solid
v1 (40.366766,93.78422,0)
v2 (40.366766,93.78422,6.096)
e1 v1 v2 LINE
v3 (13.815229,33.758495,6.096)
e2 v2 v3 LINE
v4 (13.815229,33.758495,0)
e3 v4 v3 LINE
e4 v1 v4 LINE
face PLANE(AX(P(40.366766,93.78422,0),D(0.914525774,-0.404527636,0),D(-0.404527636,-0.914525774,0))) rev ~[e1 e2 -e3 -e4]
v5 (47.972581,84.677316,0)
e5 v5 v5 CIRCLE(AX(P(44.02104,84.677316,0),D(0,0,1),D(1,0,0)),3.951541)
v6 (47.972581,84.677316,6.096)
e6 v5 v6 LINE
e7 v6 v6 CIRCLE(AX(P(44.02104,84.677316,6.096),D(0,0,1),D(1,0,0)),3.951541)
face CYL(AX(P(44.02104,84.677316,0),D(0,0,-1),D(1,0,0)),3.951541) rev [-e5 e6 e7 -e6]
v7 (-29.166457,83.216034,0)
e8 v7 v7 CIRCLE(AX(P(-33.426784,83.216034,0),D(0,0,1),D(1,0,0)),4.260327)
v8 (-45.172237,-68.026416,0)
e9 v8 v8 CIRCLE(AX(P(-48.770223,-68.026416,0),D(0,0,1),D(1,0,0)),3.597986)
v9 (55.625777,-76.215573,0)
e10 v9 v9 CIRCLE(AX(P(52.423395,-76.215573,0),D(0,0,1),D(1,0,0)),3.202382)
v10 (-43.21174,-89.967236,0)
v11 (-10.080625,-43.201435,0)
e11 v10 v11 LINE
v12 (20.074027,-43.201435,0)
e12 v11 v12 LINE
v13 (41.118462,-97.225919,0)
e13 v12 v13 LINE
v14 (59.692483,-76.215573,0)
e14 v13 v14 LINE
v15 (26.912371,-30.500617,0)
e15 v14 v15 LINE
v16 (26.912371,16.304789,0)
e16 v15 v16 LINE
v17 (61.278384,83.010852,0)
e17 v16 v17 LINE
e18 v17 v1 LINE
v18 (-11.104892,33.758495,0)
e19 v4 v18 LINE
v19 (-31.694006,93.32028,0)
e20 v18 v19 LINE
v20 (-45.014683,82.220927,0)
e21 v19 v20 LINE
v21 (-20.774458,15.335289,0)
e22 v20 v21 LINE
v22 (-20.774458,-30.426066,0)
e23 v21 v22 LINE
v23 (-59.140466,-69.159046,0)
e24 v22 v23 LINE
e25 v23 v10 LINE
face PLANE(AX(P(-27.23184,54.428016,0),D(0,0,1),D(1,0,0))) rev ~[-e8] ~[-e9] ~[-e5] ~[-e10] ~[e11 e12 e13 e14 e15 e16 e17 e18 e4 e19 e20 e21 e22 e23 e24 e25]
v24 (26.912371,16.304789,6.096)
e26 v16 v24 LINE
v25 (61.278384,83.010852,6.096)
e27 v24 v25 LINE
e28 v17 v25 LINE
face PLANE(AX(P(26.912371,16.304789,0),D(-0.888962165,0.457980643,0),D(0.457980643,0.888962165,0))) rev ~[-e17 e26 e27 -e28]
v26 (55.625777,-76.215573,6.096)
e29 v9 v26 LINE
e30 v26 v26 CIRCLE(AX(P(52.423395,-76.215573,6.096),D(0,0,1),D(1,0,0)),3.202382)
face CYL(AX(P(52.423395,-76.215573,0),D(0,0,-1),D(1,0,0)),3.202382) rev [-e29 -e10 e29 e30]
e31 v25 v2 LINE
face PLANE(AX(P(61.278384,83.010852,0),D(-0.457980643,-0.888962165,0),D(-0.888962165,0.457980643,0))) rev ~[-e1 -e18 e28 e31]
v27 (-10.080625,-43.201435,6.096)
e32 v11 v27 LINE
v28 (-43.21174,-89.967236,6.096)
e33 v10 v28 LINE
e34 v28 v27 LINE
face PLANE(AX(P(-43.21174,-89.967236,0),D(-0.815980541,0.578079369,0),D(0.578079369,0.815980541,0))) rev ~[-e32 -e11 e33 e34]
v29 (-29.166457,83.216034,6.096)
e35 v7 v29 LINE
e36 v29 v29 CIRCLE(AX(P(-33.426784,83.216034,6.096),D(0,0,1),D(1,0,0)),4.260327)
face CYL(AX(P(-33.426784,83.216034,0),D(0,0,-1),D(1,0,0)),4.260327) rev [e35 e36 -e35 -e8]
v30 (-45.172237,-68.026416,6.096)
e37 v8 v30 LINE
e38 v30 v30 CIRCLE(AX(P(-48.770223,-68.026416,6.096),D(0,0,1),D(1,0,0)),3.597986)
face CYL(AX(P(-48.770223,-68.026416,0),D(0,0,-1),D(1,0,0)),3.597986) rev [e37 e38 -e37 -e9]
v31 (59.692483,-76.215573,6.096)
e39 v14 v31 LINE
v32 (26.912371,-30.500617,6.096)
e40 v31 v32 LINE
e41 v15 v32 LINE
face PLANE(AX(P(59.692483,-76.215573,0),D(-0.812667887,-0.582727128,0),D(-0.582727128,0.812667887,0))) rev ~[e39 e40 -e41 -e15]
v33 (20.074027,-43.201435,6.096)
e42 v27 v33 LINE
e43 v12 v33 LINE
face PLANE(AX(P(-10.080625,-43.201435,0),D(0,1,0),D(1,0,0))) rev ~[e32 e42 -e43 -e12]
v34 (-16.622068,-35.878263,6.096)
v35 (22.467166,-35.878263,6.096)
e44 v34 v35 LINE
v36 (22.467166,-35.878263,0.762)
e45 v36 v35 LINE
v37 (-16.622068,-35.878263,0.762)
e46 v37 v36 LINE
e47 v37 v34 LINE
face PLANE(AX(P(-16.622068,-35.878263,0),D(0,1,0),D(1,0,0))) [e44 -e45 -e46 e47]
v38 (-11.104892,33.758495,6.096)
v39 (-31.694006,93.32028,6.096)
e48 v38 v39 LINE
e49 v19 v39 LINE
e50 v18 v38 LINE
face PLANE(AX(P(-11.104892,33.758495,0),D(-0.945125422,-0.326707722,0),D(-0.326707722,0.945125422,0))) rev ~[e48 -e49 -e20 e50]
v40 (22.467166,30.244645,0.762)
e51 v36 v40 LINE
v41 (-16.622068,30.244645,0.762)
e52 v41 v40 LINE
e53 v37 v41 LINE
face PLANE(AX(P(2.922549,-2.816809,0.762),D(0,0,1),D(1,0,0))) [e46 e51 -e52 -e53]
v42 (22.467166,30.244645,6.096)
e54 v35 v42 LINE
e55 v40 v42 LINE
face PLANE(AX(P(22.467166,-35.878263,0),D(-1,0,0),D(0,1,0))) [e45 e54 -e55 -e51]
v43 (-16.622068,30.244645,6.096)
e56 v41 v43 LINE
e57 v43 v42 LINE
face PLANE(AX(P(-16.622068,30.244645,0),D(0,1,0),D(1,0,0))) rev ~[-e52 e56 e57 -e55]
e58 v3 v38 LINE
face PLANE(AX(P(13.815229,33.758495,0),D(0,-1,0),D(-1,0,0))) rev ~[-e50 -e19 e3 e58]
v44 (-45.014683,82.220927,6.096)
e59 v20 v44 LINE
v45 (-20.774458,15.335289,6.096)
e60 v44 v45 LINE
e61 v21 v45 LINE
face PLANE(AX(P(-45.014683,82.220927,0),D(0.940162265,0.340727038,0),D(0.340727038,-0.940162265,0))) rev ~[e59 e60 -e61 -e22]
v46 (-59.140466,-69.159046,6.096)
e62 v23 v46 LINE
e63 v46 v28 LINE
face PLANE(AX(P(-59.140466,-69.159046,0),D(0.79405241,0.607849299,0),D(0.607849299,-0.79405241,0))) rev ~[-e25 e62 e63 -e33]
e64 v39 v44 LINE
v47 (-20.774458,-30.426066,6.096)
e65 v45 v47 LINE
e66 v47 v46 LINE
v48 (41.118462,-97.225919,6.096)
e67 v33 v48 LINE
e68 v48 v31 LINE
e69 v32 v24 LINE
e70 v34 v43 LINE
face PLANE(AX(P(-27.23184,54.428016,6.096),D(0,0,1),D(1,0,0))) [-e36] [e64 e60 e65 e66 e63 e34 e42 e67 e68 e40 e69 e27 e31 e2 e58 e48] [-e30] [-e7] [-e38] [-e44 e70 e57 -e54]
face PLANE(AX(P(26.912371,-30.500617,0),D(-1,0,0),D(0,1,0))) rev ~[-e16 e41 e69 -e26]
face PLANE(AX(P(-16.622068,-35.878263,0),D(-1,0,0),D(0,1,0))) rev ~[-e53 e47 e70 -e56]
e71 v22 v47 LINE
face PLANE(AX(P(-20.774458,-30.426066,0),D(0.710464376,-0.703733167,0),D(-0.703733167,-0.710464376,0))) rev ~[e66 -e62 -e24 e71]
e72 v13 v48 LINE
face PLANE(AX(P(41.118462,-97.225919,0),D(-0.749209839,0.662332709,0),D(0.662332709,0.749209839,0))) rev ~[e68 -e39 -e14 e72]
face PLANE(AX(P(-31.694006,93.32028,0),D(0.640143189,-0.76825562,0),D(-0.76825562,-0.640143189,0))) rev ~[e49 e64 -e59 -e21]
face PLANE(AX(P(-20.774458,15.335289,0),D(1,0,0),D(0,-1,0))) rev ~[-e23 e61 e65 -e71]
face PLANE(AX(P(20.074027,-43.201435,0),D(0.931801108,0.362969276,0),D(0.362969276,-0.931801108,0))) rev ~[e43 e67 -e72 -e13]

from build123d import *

# Parameters (mm, degrees)
F0_W     = 39.0892345458
F0_H     = 66.1229081452
F1_DEPTH = 0.762
F0_R     = 4.2603265816
F0_R_2   = 3.9515412254
F0_R_3   = 3.5979856565
F0_R_4   = 3.2023821092
F2_DEPTH = 6.096


# Not quite as in the source:
# - a feature of the source that left no trace in its solid (it failed there, or was rolled back) is left out


with BuildPart() as f1:
    # F0 (on Top) → F1 (new body)
    with BuildSketch(Plane.XY):
        with Locations((2.9225489125, -2.8168093413)):
            Rectangle(F0_W, F0_H)
    extrude(amount=F1_DEPTH)

    # F0 (on Top) → F2 (join)
    with BuildSketch(Plane.XY):
        Polygon((-20.7744576037, 15.3352888301), (-20.7744576037, 33.758495003), (-11.104892008, 33.758495003), (-31.6940061748, 93.3202803135), (-45.0146831572, 82.2209268808), align=None)
        with Locations((-33.4267839789, 83.2160338759)):
            Circle(F0_R, mode=Mode.SUBTRACT)
        Polygon((-11.104892008, 33.758495003), (-20.7744576037, 33.758495003), (-20.7744576037, 15.3352888301), (-20.7744576037, -30.4260663688), (-20.7744576037, -43.2014353573), (-10.0806253031, -43.2014353573), (20.0740266591, -43.2014353573), (26.9123706967, -43.2014353573), (26.9123706967, -30.5006168783), (26.9123706967, 16.304789111), (26.9123706967, 33.758495003), (13.8152288273, 33.758495003), align=None)
        with Locations((2.9225489125, -2.8168093413)):
            Rectangle(F0_W, F0_H, mode=Mode.SUBTRACT)
        Polygon((40.3667656029, 93.7842203212), (13.8152288273, 33.758495003), (26.9123706967, 33.758495003), (26.9123706967, 16.304789111), (61.2783841789, 83.0108523369), align=None)
        with Locations((44.0210402012, 84.6773162484)):
            Circle(F0_R_2, mode=Mode.SUBTRACT)
        Polygon((-20.7744576037, -43.2014353573), (-20.7744576037, -30.4260663688), (-59.1404661536, -69.1590458155), (-43.2117395103, -89.9672359228), (-10.0806253031, -43.2014353573), align=None)
        with Locations((-48.7702228129, -68.0264160037)):
            Circle(F0_R_3, mode=Mode.SUBTRACT)
        Polygon((59.6924833953, -76.2155726552), (26.9123706967, -30.5006168783), (26.9123706967, -43.2014353573), (20.0740266591, -43.2014353573), (41.1184616387, -97.2259193659), align=None)
        with Locations((52.4233952165, -76.2155726552)):
            Circle(F0_R_4, mode=Mode.SUBTRACT)
    extrude(amount=F2_DEPTH)


solid = f1.part
